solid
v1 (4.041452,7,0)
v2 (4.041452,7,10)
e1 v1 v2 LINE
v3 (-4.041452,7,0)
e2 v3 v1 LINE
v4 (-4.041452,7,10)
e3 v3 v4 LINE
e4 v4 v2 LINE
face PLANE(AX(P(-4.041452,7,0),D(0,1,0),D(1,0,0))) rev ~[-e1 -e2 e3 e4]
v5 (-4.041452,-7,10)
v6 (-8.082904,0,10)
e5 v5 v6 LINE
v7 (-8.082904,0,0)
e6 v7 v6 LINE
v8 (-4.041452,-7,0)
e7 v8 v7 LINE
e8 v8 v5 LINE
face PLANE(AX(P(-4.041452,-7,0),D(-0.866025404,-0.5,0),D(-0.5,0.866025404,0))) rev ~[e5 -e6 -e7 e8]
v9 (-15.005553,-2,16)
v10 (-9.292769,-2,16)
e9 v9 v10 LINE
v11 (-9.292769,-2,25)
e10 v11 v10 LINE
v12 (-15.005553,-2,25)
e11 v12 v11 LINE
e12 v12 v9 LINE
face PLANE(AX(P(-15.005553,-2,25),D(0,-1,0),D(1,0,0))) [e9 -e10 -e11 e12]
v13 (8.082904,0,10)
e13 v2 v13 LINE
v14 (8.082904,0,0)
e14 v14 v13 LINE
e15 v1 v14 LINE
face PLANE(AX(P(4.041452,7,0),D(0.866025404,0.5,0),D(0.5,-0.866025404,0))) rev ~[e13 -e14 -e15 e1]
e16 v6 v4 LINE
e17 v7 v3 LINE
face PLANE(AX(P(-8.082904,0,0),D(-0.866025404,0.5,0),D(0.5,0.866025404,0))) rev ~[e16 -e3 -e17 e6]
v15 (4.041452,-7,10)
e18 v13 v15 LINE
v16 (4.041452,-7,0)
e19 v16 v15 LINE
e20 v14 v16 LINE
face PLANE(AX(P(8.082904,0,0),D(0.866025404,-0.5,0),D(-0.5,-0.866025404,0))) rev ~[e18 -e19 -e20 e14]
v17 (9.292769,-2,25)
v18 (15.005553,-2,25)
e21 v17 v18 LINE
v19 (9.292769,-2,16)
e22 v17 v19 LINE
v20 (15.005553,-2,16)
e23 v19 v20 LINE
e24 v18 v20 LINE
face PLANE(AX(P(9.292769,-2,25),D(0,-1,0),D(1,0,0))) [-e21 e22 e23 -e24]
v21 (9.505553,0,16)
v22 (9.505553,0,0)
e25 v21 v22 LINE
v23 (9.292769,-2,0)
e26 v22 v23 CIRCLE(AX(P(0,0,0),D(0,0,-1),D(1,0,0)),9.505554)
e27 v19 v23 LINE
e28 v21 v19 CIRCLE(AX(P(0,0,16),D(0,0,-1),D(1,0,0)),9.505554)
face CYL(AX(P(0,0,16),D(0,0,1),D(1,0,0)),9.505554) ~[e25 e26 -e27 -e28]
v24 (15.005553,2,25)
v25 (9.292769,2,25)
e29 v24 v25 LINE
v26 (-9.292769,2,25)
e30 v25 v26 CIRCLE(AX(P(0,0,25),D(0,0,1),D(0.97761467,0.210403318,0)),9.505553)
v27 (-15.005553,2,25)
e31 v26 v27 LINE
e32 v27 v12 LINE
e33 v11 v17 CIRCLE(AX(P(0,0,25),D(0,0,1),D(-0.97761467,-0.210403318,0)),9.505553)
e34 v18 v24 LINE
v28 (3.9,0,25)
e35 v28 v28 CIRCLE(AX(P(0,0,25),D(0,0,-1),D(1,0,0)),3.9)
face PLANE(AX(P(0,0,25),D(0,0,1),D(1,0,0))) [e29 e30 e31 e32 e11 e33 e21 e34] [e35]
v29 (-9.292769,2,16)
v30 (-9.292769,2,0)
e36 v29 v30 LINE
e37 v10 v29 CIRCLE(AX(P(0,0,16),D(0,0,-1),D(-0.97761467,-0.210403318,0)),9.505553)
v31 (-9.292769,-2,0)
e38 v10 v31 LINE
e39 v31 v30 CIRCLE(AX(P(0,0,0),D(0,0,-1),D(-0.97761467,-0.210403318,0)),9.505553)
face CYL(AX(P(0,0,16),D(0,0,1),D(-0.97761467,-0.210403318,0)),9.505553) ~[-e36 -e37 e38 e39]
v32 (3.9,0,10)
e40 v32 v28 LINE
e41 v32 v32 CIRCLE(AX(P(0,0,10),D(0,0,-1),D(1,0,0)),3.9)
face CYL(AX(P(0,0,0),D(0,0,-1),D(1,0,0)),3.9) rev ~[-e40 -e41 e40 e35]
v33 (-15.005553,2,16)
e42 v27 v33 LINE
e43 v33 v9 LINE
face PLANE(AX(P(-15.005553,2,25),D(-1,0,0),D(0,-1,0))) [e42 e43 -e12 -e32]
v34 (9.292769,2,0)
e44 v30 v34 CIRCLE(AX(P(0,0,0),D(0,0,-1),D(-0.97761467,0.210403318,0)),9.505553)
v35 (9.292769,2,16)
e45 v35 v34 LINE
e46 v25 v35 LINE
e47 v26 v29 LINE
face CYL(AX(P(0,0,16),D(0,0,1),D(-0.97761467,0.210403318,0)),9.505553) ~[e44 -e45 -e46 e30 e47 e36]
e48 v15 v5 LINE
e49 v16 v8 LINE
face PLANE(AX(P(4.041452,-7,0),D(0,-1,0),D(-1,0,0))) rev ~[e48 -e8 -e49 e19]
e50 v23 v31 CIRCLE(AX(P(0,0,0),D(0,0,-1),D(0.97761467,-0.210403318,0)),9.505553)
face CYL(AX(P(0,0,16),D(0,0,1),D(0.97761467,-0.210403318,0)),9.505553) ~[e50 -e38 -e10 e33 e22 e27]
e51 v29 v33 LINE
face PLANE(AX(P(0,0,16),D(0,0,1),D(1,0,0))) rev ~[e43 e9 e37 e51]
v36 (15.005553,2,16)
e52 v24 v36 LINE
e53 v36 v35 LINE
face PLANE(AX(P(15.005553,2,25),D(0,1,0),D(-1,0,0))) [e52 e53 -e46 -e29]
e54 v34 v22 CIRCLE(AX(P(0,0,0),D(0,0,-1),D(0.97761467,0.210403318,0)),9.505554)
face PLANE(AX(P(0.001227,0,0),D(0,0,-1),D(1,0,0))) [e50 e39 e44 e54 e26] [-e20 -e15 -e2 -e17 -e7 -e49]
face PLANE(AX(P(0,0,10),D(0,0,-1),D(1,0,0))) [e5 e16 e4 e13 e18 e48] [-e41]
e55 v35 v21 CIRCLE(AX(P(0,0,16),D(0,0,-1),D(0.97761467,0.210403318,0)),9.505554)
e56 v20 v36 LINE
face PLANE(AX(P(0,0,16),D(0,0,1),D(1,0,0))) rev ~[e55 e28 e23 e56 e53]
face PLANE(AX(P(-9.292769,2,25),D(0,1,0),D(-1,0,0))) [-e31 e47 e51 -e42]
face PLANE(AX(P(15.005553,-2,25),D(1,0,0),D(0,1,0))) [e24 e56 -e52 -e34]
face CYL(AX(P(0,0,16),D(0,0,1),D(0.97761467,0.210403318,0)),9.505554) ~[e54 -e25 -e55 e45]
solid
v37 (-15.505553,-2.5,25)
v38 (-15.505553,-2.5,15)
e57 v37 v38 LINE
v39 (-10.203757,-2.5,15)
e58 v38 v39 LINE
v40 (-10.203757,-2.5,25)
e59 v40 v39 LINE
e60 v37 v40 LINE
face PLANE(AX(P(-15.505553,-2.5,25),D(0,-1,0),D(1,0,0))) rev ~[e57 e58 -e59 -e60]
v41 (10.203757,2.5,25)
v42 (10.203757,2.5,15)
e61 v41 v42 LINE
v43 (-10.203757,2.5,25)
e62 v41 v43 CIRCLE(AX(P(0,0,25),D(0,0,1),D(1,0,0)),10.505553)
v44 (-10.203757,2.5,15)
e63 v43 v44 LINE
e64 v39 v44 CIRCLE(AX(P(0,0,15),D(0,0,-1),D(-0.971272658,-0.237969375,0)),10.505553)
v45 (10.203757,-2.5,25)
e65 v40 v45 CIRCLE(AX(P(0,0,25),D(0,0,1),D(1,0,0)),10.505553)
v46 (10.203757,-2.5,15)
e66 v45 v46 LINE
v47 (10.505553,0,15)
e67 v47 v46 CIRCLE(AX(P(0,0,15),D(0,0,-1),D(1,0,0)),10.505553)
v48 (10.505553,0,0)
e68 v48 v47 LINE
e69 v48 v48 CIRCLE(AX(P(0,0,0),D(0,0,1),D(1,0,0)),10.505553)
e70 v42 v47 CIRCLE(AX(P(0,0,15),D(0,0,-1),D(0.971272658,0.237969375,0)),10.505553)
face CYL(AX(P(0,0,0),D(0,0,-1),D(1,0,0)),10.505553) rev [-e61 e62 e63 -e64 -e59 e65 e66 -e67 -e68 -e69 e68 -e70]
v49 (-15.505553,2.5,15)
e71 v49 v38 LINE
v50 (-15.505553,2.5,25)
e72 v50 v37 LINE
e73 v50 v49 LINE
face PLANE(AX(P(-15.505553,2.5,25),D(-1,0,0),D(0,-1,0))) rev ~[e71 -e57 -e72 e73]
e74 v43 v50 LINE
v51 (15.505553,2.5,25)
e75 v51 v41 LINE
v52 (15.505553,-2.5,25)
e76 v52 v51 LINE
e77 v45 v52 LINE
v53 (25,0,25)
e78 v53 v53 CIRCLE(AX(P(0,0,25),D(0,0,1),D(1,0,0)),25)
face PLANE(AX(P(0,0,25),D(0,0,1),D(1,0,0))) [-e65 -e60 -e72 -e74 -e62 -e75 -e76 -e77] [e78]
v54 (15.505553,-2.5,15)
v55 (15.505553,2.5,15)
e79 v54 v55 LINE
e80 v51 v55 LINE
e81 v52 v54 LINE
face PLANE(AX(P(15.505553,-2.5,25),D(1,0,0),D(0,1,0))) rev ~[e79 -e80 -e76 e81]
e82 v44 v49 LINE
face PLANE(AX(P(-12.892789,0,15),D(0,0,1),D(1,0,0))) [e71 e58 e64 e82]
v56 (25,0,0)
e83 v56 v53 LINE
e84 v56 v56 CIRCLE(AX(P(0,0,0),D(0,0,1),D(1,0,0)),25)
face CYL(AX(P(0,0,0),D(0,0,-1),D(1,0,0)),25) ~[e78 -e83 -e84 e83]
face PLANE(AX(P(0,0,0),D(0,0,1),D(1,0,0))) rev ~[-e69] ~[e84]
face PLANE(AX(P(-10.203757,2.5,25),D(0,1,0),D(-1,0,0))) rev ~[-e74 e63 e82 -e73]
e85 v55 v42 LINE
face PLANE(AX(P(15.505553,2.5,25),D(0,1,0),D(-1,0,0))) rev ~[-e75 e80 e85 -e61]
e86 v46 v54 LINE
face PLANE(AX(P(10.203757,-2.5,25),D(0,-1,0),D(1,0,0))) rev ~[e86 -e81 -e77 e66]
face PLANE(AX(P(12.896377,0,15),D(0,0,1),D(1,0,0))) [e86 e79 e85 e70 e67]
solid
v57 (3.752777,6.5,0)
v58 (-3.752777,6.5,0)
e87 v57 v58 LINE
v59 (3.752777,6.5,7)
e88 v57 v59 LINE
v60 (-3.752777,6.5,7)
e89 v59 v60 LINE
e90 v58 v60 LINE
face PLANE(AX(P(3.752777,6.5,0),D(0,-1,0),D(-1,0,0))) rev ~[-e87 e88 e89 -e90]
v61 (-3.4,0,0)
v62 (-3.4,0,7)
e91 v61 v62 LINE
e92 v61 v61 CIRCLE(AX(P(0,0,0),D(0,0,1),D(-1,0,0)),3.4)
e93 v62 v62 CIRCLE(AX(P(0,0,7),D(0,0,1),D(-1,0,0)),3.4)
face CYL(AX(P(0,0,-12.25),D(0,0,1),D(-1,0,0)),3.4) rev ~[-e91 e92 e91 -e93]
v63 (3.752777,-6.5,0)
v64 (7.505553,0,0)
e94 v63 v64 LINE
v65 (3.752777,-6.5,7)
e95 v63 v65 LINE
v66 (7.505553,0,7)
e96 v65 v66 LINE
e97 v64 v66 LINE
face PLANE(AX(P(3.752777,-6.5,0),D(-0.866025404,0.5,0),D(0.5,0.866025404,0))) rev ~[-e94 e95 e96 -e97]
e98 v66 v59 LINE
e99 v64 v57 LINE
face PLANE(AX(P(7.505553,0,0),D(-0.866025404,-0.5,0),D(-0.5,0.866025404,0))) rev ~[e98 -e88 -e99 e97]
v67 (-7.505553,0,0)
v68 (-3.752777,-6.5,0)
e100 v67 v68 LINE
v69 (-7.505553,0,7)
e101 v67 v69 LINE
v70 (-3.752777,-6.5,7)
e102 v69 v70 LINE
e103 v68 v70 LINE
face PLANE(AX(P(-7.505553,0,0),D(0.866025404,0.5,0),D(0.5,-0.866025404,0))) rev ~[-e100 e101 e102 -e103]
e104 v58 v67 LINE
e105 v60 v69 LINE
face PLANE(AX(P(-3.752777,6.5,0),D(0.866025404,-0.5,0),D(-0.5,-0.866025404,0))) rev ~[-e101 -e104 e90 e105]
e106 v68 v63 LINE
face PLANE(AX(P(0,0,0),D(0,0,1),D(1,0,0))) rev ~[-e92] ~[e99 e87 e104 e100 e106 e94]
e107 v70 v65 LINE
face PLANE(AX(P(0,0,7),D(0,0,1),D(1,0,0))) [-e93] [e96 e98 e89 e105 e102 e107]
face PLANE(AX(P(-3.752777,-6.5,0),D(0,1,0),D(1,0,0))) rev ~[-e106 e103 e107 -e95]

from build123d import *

# Parameters (mm, degrees)
F0_R      = 25
F0_R_2    = 10.5055534995
F1_DEPTH  = 25
F2_DEPTH  = 7
F3_D      = 6.8
F3_DEPTH  = 12.25
F3_TIP    = 2.0429261047
F5_DEPTH  = 10
F7_DEPTH  = 9
F9_DEPTH  = 16
F10_R     = 3.9
F11_DEPTH = 10
F12_DEPTH = 25


with BuildPart() as f1:
    # F0 (on Top) → F1 (new body)
    with BuildSketch(Plane.XY):
        Circle(F0_R)
        Circle(F0_R_2, mode=Mode.SUBTRACT)
    extrude(amount=F1_DEPTH)

    # F4 (on face) → F5 (cut)
    with BuildSketch(Plane.XY.offset(25)):
        with BuildLine():
            Line((-10.2037568733, 2.5), (-15.5055534995, 2.5))
            Line((-15.5055534995, 2.5), (-15.5055534995, -2.5))
            Line((-15.5055534995, -2.5), (-10.2037568733, -2.5))
            ThreePointArc((-10.2037568733, -2.5), (-10.5055534995, 0), (-10.2037568733, 2.5))
        make_face()
        with BuildLine():
            Line((15.5055534995, 2.5), (10.2037568733, 2.5))
            ThreePointArc((10.2037568733, 2.5), (10.4298314478, 1.2590751768), (10.5055534995, 0))
            ThreePointArc((10.5055534995, 0), (10.4298314478, -1.2590751768), (10.2037568733, -2.5))
            Line((10.2037568733, -2.5), (15.5055534995, -2.5))
            Line((15.5055534995, -2.5), (15.5055534995, 2.5))
        make_face()
    extrude(amount=-F5_DEPTH, mode=Mode.SUBTRACT)


with BuildPart() as f2:
    # F0 (on Top) → F2 (new body)
    with BuildSketch(Plane.XY):
        Polygon((3.7527767497, 6.5), (-3.7527767497, 6.5), (-7.5055534995, 0), (-3.7527767497, -6.5), (3.7527767497, -6.5), (7.5055534995, 0), align=None)
    extrude(amount=F2_DEPTH)

    # F3
    with Locations(Plane(origin=(0, 0, 0), x_dir=(1, 0, 0), z_dir=(0, 0, -1))):
        with Locations((0, 0)):
            Hole(F3_D / 2, depth=F3_DEPTH)
            with Locations((0, 0, -(F3_DEPTH + F3_TIP / 2))):  # 118° drill point
                Cone(0, F3_D / 2, F3_TIP, mode=Mode.SUBTRACT)


with BuildPart() as f7:
    # F6 (on face) → F7 (new body, through all)
    with BuildSketch(Plane.XY.offset(25)):
        with BuildLine():
            Line((-15.0055534995, -2), (-9.2927685504, -2))
            ThreePointArc((-9.2927685504, -2), (0, -9.5055534995), (9.2927685504, -2))
            Line((9.2927685504, -2), (15.0055534995, -2))
            Line((15.0055534995, -2), (15.0055534995, 2))
            Line((15.0055534995, 2), (9.2927685504, 2))
            ThreePointArc((9.2927685504, 2), (0, 9.5055534995), (-9.2927685504, 2))
            Line((-9.2927685504, 2), (-15.0055534995, 2))
            Line((-15.0055534995, 2), (-15.0055534995, -2))
        make_face()
    extrude(amount=-F7_DEPTH)

    # F8 (on face) → F9 (join, through all)
    with BuildSketch(Plane(origin=(0, 0, 16), x_dir=(1, 0, 0), z_dir=(0, 0, -1))):
        with BuildLine():
            ThreePointArc((9.2927685504, -2), (9.4522075714, -1.0056437533), (9.5055534995, 0))
            ThreePointArc((9.5055534995, 0), (9.4522075714, 1.0056437533), (9.2927685504, 2))
            ThreePointArc((9.2927685504, 2), (0, 9.5055534995), (-9.2927685504, 2))
            ThreePointArc((-9.2927685504, 2), (-9.5055534995, 0), (-9.2927685504, -2))
            ThreePointArc((-9.2927685504, -2), (0, -9.5055534995), (9.2927685504, -2))
        make_face()
    extrude(amount=F9_DEPTH)

    # F10 (on face) → F11 (cut)
    with BuildSketch(Plane(origin=(0, 0, 0), x_dir=(1, 0, 0), z_dir=(0, 0, -1))):
        Polygon((8.0829037687, 0), (4.0414518843, 7), (-4.0414518843, 7), (-8.0829037687, 0), (-4.0414518843, -7), (4.0414518843, -7), align=None)
        Polygon((-7.5055534995, 0), (-3.7527767497, 6.5), (3.7527767497, 6.5), (7.5055534995, 0), (3.7527767497, -6.5), (-3.7527767497, -6.5), align=None, mode=Mode.SUBTRACT)
        Polygon((3.7527767497, 6.5), (-3.7527767497, 6.5), (-7.5055534995, 0), (-3.7527767497, -6.5), (3.7527767497, -6.5), (7.5055534995, 0), align=None)
        Circle(F10_R, mode=Mode.SUBTRACT)
        Circle(F10_R)
    extrude(amount=-F11_DEPTH, mode=Mode.SUBTRACT)

    # F10 (on face) → F12 (cut, through all)
    with BuildSketch(Plane(origin=(0, 0, 0), x_dir=(1, 0, 0), z_dir=(0, 0, -1))):
        Circle(F10_R)
    extrude(amount=-F12_DEPTH, mode=Mode.SUBTRACT)


solid = Compound([f1.part, f2.part, f7.part])
